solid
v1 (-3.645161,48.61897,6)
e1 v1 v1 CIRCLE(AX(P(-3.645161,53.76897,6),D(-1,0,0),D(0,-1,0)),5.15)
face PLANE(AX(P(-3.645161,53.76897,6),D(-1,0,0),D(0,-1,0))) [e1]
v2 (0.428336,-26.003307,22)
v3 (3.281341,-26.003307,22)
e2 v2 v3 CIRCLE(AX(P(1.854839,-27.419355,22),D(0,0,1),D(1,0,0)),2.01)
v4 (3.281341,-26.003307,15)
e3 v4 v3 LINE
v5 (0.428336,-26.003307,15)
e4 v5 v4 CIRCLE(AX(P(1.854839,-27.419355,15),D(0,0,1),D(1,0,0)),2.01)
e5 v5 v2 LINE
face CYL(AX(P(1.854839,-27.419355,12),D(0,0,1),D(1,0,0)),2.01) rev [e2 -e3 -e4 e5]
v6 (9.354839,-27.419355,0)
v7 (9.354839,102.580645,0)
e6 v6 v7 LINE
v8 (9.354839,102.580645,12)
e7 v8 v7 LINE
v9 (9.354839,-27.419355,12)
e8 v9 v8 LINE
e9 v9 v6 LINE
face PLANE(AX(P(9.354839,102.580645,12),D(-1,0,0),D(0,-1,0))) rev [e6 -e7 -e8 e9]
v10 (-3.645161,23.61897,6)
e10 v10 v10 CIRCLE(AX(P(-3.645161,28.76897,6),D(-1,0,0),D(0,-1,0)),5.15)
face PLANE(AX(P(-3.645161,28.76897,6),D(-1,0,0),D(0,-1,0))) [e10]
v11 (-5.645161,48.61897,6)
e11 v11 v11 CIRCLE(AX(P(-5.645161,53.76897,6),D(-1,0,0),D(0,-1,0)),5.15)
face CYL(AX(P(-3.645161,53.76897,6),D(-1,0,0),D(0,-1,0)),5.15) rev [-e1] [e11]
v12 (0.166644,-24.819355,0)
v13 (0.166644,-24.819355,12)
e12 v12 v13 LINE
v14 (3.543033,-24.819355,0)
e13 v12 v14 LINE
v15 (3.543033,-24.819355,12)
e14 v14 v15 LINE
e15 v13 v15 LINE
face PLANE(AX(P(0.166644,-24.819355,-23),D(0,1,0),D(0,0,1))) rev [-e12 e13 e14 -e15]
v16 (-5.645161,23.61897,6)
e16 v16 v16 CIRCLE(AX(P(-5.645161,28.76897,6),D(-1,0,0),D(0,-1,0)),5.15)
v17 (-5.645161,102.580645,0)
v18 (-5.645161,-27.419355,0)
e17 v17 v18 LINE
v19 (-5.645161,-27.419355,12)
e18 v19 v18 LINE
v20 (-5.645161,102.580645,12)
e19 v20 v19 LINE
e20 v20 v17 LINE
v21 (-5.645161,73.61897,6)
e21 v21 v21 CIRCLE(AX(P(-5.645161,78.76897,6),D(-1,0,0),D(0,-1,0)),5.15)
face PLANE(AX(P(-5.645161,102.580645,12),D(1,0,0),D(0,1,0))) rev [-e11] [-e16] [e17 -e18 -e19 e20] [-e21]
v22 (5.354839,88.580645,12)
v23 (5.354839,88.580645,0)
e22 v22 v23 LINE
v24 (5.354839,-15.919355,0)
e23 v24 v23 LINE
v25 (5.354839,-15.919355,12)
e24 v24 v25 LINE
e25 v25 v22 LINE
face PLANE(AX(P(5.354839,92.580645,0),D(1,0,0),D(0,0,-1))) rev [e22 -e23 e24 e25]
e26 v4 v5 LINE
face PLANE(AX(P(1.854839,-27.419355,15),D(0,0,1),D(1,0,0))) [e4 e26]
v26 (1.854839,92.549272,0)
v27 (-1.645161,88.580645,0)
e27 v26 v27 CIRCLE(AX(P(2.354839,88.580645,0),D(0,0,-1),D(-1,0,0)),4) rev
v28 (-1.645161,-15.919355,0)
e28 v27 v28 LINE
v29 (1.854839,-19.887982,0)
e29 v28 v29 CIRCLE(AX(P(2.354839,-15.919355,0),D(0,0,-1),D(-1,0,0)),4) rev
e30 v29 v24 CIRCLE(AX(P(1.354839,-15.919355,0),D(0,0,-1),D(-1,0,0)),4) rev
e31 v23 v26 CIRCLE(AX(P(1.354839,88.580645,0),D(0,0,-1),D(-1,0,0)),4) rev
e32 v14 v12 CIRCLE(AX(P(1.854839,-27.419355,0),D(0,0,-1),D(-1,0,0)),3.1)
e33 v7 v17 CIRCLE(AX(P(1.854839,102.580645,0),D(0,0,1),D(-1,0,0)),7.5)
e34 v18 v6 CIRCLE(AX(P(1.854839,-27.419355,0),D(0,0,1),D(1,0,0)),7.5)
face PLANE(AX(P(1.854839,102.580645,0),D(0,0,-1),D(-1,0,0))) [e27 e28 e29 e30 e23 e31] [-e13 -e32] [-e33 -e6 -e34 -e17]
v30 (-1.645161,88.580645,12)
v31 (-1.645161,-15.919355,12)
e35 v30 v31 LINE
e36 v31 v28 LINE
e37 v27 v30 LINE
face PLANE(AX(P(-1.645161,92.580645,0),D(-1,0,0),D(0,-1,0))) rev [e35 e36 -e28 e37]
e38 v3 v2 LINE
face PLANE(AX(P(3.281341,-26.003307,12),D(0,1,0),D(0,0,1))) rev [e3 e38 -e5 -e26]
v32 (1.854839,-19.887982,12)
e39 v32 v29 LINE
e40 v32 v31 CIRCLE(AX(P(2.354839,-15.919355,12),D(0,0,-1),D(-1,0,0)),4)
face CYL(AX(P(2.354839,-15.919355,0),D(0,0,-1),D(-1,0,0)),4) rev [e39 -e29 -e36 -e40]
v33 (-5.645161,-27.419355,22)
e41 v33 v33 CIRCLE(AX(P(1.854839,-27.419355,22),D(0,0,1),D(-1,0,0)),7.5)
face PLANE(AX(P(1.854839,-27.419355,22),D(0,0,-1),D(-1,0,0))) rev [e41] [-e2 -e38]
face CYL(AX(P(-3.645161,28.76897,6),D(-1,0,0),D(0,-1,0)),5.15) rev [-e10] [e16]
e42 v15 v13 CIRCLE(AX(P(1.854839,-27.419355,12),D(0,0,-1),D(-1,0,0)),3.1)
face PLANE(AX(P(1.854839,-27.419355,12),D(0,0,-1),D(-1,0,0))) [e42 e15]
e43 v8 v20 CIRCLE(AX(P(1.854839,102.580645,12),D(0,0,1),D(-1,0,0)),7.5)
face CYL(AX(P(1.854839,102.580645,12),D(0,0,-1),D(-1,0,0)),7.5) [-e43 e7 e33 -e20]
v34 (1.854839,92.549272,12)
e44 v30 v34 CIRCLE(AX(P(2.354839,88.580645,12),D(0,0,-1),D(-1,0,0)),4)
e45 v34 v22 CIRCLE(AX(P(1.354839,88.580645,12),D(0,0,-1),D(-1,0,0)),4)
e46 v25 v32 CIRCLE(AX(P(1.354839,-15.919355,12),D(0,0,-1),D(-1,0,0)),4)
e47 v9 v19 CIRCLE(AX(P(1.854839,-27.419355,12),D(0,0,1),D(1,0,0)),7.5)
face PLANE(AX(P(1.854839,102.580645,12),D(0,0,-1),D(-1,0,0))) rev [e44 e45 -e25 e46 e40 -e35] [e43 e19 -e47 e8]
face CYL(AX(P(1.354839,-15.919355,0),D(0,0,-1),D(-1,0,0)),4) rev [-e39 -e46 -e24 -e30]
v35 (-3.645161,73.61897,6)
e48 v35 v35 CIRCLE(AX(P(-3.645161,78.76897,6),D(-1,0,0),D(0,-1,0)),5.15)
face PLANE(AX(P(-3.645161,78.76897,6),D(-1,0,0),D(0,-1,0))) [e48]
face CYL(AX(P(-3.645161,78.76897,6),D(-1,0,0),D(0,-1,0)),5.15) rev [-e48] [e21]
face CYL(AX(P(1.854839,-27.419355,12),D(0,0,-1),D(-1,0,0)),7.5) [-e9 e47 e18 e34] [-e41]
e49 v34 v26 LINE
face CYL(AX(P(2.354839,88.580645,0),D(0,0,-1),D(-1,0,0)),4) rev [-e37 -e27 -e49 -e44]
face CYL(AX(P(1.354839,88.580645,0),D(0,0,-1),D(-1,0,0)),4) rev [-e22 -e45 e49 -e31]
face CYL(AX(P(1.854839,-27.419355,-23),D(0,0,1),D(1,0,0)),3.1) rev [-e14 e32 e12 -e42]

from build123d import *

# Parameters (mm, degrees)
BOSS_EXTRUDE1_DEPTH = 12
SKETCH2_R           = 3.1
BOSS_EXTRUDE2_DEPTH = 15
CUT_EXTRUDE1_START  = -50
CUT_EXTRUDE1_DEPTH  = 50
CUT_EXTRUDE2_START  = -15
CUT_EXTRUDE2_DEPTH  = 15
SKETCH5_W           = 7
SKETCH5_H           = 112.5
CUT_EXTRUDE3_DEPTH  = 12
SKETCH6_R           = 5.15
CUT_EXTRUDE4_DEPTH  = 2
FILLET1_R           = 4
BOSS_EXTRUDE3_DEPTH = 10
SKETCH9_R           = 2.1
CUT_EXTRUDE5_DEPTH  = 7
BOSS_EXTRUDE4_DEPTH = 7
SKETCH11_W          = 3.391399245
SKETCH11_H          = 0.49647288
BOSS_EXTRUDE7_DEPTH = 7
BOSS_EXTRUDE8_DEPTH = 10


with BuildPart() as part:
    # Sketch1 → Boss-Extrude1 (new body)
    with BuildSketch(Plane.XY):
        with BuildLine():
            Line((-5.64516129, 102.580645161), (-5.64516129, -27.419354839))
            ThreePointArc((-5.64516129, -27.419354839), (1.85483871, -34.919354839), (9.35483871, -27.419354839))
            Line((9.35483871, -27.419354839), (9.35483871, 102.580645161))
            ThreePointArc((9.35483871, 102.580645161), (1.85483871, 110.080645161), (-5.64516129, 102.580645161))
        make_face()
    extrude(amount=BOSS_EXTRUDE1_DEPTH)

    # Sketch2 → Boss-Extrude2 (add)
    with BuildSketch(Plane.XY.offset(12)):
        with Locations(Location((1.85483871, -27.419354839, 0), (0, 0, 180))):
            Circle(SKETCH2_R)
    extrude(amount=BOSS_EXTRUDE2_DEPTH)

    # Sketch3 → Cut-Extrude1 (cut)
    with BuildSketch(Plane.XY.offset(27).offset(CUT_EXTRUDE1_START)):
        with BuildLine():
            Line((0.166644408, -24.819354839), (3.543033011, -24.819354839))
            ThreePointArc((3.543033011, -24.819354839), (1.85483871, -30.519354839), (0.166644408, -24.819354839))
        make_face()
    extrude(amount=CUT_EXTRUDE1_DEPTH, mode=Mode.SUBTRACT)

    # Sketch4 → Cut-Extrude2 (cut)
    with BuildSketch(Plane.XY.offset(27).offset(CUT_EXTRUDE2_START)):
        with BuildLine():
            Line((0.166644408, -24.819354839), (3.543033011, -24.819354839))
            ThreePointArc((3.543033011, -24.819354839), (1.85483871, -24.319354839), (0.166644408, -24.819354839))
        make_face()
    extrude(amount=CUT_EXTRUDE2_DEPTH, mode=Mode.SUBTRACT)

    # Sketch5 → Cut-Extrude3 (cut)
    with BuildSketch(Plane.XY.offset(12)):
        with Locations((1.85483871, 36.330645161)):
            Rectangle(SKETCH5_W, SKETCH5_H)
    extrude(amount=-CUT_EXTRUDE3_DEPTH, mode=Mode.SUBTRACT)

    # Sketch6 → Cut-Extrude4 (cut)
    with BuildSketch(Plane.ZY.offset(5.64516129)):
        with Locations(Location((6, 78.768969581, 0), (0, 0, 270))):
            Circle(SKETCH6_R)
        with Locations(Location((6, 53.768969581, 0), (0, 0, 270))):
            Circle(SKETCH6_R)
        with Locations(Location((6, 28.768969581, 0), (0, 0, 270))):
            Circle(SKETCH6_R)
    extrude(amount=-CUT_EXTRUDE4_DEPTH, mode=Mode.SUBTRACT)

    # Fillet1
    # the kernel refuses this fillet: 4 mm, written as the material it adds along each edge
    with BuildSketch(Plane(origin=(-1.64516129, -19.919354839, 12), x_dir=(0, 1, 0), z_dir=(0, 0, -1)), Plane(origin=(5.35483871, -19.919354839, 12), x_dir=(-1, 0, 0), z_dir=(0, 0, -1)), Plane(origin=(5.35483871, 92.580645161, 12), x_dir=(0, -1, 0), z_dir=(0, 0, -1))) as fillet1_piece_1:
        with BuildLine():
            CenterArc((FILLET1_R, FILLET1_R), FILLET1_R, 180, 90)
            Line((0, FILLET1_R), (0, 0))
            Line((0, 0), (FILLET1_R, 0))
        make_face()
    extrude(amount=12)
    with BuildSketch(Plane(origin=(-1.64516129, 92.580645161, 12), x_dir=(0, -1, 0), z_dir=(0, 0, -1))) as fillet1_piece_2:
        with BuildLine():
            CenterArc((FILLET1_R, -FILLET1_R), FILLET1_R, 90, 90)
            Line((0, -FILLET1_R), (0, 0))
            Line((0, 0), (FILLET1_R, 0))
        make_face()
    extrude(amount=12)

    # Sketch7 → Boss-Extrude3 (add)
    with BuildSketch(Plane.XY.offset(12)):
        with BuildLine():
            ThreePointArc((-5.64516129, -27.419354839), (1.85483871, -34.919354839), (9.35483871, -27.419354839))
            ThreePointArc((9.35483871, -27.419354839), (1.85483871, -19.919354839), (-5.64516129, -27.419354839))
        make_face()
    extrude(amount=BOSS_EXTRUDE3_DEPTH)

    # Sketch9 → Cut-Extrude5 (cut)
    with BuildSketch(Plane.XY.offset(22)):
        with Locations((1.85483871, -27.419354839)):
            Circle(SKETCH9_R)
    extrude(amount=-CUT_EXTRUDE5_DEPTH, mode=Mode.SUBTRACT)

    # Sketch10 → Boss-Extrude4 (add)
    with BuildSketch(Plane.XY.offset(22)):
        with BuildLine():
            Line((0.694020033, -25.669354839), (3.015657386, -25.669354839))
            ThreePointArc((3.015657386, -25.669354839), (1.85483871, -25.319354839), (0.694020033, -25.669354839))
        make_face()
    extrude(amount=-BOSS_EXTRUDE4_DEPTH)

    # Sketch11 → Boss-Extrude7 (add)
    with BuildSketch(Plane.XY.offset(22)):
        with Locations((1.841860982, -25.665070635)):
            Rectangle(SKETCH11_W, SKETCH11_H)
    extrude(amount=-BOSS_EXTRUDE7_DEPTH)

    # Sketch12 → Boss-Extrude8 (add)
    with BuildSketch(Plane.XY.offset(22)):
        with BuildLine():
            Line((0.39134285, -25.913307075), (3.31833457, -25.913307075))
            ThreePointArc((3.31833457, -25.913307075), (1.85483871, -29.519354839), (0.39134285, -25.913307075))
        make_face()
        with BuildLine():
            Line((3.281340981, -26.003307075), (0.428336439, -26.003307075))
            ThreePointArc((0.428336439, -26.003307075), (1.85483871, -29.429354839), (3.281340981, -26.003307075))
        make_face(mode=Mode.SUBTRACT)
    extrude(amount=-BOSS_EXTRUDE8_DEPTH)


solid = part.part
